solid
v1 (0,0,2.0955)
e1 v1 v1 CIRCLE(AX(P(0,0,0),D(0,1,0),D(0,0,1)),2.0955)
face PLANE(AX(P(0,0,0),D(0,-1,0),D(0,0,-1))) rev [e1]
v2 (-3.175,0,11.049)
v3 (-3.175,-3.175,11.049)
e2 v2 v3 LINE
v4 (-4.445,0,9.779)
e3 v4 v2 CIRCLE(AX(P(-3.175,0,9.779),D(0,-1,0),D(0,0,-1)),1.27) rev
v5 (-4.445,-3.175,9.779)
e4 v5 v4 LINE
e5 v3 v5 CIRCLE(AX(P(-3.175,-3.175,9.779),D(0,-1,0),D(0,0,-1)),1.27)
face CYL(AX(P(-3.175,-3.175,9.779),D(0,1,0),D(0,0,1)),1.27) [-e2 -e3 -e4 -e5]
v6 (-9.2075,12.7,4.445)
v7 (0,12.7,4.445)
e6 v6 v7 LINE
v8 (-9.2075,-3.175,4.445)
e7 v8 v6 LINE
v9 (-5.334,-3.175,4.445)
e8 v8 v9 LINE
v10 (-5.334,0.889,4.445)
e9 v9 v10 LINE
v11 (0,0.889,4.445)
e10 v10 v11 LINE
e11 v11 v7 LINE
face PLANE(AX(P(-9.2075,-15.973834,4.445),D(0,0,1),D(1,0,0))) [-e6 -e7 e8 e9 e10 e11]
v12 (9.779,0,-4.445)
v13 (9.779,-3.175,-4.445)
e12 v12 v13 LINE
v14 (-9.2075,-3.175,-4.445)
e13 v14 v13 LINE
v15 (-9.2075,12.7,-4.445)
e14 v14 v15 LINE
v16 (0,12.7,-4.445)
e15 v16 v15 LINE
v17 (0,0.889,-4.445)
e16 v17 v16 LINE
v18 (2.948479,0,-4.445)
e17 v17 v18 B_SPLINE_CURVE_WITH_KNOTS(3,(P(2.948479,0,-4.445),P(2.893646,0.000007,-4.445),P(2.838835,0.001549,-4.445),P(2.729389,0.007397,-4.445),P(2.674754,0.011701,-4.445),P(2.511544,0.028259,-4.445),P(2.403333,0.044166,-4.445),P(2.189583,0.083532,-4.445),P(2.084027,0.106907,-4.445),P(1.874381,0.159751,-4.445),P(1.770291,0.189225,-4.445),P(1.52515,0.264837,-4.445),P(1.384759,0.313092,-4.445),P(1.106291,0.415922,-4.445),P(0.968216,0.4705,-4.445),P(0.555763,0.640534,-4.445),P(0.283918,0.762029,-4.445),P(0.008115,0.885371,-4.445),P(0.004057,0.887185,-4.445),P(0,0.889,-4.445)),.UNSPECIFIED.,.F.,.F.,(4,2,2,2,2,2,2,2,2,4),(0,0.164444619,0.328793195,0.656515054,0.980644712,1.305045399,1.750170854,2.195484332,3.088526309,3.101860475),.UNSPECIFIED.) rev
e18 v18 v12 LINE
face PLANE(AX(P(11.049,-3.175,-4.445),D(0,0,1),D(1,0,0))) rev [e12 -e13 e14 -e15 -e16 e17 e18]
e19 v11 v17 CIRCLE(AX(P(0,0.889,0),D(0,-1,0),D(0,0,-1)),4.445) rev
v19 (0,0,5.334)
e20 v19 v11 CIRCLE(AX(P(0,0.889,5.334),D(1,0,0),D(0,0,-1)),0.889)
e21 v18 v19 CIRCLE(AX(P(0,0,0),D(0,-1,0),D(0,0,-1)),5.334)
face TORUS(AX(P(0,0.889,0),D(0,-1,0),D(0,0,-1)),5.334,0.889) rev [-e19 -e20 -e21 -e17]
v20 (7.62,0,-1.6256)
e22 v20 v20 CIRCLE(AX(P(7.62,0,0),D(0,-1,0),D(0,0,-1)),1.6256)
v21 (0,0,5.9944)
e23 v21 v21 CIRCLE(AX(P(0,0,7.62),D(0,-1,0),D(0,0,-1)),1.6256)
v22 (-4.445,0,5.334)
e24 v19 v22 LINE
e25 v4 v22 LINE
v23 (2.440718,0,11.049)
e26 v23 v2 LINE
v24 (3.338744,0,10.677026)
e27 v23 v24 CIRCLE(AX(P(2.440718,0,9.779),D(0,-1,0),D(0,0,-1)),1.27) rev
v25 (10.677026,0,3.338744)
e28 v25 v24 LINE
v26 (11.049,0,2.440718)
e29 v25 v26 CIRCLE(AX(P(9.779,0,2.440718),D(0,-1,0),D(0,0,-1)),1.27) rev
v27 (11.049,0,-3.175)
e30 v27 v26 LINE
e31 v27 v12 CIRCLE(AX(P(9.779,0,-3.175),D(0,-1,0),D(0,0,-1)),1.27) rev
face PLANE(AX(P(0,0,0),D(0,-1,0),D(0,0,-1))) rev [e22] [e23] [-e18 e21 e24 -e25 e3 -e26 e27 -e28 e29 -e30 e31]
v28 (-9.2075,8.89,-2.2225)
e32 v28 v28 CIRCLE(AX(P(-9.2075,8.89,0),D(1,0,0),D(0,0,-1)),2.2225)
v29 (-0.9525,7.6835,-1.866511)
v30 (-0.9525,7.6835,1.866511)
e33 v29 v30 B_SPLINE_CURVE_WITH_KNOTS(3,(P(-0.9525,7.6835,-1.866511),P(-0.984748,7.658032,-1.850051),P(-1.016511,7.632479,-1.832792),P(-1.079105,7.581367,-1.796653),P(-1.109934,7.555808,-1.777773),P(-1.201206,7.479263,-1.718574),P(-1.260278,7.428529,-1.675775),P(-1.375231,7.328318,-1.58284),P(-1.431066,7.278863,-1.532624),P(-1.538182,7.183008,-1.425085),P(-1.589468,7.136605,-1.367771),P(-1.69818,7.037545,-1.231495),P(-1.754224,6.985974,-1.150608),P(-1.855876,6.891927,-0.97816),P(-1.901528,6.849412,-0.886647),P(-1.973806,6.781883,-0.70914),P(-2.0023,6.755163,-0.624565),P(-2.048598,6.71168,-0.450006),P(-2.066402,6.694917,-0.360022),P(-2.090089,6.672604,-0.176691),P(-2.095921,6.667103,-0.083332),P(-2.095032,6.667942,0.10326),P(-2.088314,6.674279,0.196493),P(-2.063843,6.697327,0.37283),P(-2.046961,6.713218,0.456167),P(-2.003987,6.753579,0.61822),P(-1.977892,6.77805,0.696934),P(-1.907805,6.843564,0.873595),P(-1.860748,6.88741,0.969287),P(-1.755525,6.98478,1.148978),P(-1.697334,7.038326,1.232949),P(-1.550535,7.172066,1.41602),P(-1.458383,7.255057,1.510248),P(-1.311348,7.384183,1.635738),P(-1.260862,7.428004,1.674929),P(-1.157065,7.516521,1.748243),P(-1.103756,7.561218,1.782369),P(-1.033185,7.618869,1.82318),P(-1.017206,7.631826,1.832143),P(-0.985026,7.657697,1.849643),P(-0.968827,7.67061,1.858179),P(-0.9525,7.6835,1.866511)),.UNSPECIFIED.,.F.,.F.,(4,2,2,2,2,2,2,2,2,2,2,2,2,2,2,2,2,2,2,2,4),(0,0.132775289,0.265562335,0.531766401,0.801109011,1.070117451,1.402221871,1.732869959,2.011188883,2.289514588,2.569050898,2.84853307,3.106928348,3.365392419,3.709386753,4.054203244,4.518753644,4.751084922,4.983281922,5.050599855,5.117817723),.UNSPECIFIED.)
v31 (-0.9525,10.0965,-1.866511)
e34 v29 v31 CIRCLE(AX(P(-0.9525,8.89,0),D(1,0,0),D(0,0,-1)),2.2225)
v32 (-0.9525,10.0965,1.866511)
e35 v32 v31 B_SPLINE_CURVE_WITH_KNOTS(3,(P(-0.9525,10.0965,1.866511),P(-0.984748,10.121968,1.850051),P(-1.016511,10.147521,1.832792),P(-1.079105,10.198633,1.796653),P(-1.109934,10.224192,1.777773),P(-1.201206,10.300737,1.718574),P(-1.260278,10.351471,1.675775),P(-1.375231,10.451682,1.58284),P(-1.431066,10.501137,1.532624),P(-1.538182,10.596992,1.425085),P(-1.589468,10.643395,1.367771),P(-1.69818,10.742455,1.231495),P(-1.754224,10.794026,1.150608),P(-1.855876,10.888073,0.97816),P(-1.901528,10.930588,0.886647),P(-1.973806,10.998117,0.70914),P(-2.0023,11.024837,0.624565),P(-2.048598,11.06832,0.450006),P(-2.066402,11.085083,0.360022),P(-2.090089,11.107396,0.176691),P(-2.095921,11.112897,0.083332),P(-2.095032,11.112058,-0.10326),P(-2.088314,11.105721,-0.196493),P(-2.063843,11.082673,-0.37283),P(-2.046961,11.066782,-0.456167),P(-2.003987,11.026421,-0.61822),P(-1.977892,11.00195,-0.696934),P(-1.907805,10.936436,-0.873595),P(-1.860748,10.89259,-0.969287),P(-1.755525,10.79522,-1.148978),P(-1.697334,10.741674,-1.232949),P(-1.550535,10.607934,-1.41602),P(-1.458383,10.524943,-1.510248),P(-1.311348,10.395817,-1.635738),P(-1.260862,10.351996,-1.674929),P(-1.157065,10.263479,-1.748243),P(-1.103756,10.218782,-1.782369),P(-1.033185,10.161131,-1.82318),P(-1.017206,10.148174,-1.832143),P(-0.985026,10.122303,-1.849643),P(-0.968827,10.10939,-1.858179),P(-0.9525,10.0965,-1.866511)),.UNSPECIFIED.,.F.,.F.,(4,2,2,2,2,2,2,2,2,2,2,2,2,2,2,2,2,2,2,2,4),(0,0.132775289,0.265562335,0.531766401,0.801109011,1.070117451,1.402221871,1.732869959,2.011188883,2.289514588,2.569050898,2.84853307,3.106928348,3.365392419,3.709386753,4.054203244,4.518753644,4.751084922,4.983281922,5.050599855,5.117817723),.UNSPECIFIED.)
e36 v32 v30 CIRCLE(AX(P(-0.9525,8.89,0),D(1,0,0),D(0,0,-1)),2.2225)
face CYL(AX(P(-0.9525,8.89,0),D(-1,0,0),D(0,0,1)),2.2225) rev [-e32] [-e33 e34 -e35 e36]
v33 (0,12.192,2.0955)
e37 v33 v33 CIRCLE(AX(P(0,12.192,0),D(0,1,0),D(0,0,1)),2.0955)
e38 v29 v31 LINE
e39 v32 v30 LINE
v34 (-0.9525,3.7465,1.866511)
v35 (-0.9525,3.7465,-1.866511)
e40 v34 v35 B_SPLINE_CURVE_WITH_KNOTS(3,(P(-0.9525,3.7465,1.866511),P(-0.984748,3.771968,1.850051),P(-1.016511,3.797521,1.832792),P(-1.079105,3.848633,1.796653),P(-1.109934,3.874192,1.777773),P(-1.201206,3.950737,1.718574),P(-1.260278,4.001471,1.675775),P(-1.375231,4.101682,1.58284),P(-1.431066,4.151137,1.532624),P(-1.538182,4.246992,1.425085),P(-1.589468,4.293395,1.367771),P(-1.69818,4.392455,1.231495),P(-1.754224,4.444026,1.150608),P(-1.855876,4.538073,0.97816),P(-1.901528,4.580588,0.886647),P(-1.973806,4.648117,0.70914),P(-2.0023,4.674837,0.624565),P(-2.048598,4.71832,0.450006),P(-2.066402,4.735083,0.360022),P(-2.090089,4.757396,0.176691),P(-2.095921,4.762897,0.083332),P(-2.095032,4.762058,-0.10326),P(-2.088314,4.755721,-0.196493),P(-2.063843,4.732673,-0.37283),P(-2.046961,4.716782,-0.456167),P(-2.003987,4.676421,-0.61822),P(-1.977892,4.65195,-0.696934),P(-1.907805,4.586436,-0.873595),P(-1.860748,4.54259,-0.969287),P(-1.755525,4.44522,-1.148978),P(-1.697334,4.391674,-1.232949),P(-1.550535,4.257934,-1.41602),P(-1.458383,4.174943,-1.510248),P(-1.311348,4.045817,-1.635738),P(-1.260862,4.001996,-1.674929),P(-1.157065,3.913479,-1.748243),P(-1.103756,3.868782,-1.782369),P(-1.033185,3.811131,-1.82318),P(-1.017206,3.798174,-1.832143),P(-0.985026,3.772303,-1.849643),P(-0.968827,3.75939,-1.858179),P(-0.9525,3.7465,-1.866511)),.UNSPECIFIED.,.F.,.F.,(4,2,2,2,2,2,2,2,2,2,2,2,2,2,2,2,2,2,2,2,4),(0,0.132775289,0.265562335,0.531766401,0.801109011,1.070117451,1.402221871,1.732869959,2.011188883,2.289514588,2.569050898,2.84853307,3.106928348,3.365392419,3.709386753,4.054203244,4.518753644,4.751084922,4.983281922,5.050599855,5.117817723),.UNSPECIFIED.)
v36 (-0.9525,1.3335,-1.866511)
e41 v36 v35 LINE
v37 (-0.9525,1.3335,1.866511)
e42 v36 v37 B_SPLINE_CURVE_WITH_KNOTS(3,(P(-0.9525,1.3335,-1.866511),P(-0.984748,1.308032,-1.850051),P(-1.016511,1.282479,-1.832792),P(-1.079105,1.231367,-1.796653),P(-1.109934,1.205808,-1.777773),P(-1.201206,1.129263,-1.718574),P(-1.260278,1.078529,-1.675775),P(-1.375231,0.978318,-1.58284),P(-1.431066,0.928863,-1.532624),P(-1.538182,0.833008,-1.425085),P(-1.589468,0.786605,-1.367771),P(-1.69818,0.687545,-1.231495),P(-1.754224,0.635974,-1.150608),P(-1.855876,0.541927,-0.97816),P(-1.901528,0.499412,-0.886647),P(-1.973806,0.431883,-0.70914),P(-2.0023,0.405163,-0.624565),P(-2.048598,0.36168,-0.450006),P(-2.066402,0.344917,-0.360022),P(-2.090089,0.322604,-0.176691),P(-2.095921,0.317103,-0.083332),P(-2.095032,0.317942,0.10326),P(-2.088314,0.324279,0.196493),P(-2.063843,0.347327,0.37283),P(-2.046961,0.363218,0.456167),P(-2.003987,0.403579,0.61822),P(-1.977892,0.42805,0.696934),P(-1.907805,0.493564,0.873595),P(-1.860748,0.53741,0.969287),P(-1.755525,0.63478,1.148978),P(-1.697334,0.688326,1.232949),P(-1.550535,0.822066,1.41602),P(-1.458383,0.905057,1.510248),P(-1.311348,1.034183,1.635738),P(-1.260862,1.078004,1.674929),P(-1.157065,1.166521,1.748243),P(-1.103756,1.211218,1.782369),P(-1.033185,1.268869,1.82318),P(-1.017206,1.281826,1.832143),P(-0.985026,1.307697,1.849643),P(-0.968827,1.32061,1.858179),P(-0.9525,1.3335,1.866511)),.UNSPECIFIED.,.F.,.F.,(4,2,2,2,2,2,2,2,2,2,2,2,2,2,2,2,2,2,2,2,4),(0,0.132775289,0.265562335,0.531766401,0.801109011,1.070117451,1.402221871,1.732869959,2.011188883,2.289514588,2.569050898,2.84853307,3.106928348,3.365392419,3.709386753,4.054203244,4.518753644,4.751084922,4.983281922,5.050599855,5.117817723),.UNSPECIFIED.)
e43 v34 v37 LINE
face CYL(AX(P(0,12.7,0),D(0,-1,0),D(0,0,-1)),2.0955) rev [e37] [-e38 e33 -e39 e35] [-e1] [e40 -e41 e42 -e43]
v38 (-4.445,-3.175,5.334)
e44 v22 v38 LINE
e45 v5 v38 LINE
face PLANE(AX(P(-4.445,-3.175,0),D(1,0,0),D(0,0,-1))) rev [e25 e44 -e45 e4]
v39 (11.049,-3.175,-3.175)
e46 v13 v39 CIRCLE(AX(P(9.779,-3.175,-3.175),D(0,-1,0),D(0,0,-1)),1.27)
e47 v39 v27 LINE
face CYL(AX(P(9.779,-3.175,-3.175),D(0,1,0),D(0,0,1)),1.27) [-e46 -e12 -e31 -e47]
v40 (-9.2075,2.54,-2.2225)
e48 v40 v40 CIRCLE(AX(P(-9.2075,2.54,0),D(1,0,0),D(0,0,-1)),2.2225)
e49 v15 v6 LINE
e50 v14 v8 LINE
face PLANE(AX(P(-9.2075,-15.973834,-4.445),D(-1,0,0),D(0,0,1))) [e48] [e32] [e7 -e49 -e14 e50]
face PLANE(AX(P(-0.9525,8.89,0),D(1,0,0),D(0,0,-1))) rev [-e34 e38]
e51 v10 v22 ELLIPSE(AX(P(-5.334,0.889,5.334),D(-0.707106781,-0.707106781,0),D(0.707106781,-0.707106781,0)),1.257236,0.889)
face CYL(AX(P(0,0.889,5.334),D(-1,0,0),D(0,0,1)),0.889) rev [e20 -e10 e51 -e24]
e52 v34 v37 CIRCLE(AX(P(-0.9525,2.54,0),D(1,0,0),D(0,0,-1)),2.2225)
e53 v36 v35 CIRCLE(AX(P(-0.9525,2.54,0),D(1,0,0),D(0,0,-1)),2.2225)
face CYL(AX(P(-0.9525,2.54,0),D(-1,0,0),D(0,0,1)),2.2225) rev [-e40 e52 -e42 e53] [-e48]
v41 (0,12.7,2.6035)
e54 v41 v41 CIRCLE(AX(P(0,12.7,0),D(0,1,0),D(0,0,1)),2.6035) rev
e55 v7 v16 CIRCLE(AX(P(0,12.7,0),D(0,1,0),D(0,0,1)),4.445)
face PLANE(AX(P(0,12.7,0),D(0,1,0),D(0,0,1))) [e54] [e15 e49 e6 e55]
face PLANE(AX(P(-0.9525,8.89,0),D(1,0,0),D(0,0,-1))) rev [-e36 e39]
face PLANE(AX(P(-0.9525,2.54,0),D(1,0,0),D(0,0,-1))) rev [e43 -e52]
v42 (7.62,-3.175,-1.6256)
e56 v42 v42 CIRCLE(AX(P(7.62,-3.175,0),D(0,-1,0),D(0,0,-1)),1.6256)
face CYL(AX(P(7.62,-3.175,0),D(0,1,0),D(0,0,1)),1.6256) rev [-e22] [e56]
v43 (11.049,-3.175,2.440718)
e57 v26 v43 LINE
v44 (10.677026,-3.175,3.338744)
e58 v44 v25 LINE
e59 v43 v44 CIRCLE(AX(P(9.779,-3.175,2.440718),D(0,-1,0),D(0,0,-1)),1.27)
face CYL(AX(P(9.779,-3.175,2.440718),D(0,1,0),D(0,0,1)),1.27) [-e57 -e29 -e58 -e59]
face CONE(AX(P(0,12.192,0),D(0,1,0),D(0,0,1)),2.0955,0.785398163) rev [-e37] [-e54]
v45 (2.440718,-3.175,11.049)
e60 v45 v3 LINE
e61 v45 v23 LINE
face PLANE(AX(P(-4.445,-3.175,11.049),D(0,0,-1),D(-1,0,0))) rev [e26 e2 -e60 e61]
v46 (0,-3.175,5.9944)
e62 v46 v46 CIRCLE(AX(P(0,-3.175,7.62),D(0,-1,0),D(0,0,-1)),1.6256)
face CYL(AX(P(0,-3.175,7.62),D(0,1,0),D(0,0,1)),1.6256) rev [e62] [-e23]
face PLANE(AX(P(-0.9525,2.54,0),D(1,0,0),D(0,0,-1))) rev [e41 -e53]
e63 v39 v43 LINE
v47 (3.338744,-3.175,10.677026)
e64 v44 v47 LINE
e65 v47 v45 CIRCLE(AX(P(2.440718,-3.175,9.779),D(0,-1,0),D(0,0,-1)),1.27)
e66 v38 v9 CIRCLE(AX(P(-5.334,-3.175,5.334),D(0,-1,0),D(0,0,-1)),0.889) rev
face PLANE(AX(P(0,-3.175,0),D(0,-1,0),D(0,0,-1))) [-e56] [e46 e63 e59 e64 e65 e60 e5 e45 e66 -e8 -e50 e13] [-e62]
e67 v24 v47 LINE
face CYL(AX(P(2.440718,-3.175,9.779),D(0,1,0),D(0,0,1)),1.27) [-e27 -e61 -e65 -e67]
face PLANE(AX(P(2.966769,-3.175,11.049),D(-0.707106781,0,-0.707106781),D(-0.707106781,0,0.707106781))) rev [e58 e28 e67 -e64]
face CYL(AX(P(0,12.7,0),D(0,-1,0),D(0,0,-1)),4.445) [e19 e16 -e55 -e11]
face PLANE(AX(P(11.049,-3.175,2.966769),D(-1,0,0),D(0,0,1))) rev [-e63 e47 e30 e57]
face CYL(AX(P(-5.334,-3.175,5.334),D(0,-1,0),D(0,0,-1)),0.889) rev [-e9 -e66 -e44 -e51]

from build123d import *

# Parameters (mm, degrees)
SKETCH1_R           = 4.445
SKETCH1_R_2         = 2.0955
BOSS_EXTRUDE1_DEPTH = 12.7
BOSS_EXTRUDE2_START = 3.175
SKETCH2_R           = 1.6256
BOSS_EXTRUDE2_DEPTH = 3.175
FILLET5_R           = 1.27
BOSS_EXTRUDE3_REACH = 24.275
CHAMFER1_SIZE       = 0.508
SKETCH3_R           = 2.2225
CUT_EXTRUDE1_DEPTH  = 8.255
FILLET6_R           = 0.889


with BuildPart() as part:
    # Sketch1 → Boss-Extrude1 (new body)
    with BuildSketch(Plane(origin=(0, 0, 0), x_dir=(1, 0, 0), z_dir=(0, 1, 0))):
        with Locations(Location((0, 0, 0), (0, 0, 270))):
            Circle(SKETCH1_R)
        with Locations(Location((0, 0, 0), (0, 0, 270))):
            Circle(SKETCH1_R_2, mode=Mode.SUBTRACT)
    extrude(amount=BOSS_EXTRUDE1_DEPTH)

    # Sketch2 → Boss-Extrude2 (add)
    with BuildSketch(Plane.XZ.offset(BOSS_EXTRUDE2_START)):
        with BuildLine():
            Line((-4.445, 0), (-4.445, 11.049))
            Line((-4.445, 11.049), (2.966769491, 11.049))
            Line((2.966769491, 11.049), (11.049, 2.966769491))
            Line((11.049, 2.966769491), (11.049, -4.445))
            Line((11.049, -4.445), (0, -4.445))
            ThreePointArc((0, -4.445), (-3.143089642, -3.143089642), (-4.445, 0))
        make_face()
        with Locations(Location((0, 7.62, 0), (0, 0, 270))):
            Circle(SKETCH2_R, mode=Mode.SUBTRACT)
        with Locations(Location((7.62, 0, 0), (0, 0, 270))):
            Circle(SKETCH2_R, mode=Mode.SUBTRACT)
    extrude(amount=-BOSS_EXTRUDE2_DEPTH)

    # Fillet5
    fillet5_edges = [part.edges().sort_by_distance(p)[0] for p in [
        (11.049, -1.5875, -4.445),
        (11.049, -1.5875, 2.966769491),
        (2.966769491, -1.5875, 11.049),
        (-4.445, -1.5875, 11.049),
    ]]
    fillet(fillet5_edges, radius=FILLET5_R)

    # Boss-Extrude3: up to this face of the body (flat: up to its plane)
    boss_extrude3_end = Plane(part.part.faces().sort_by_distance((2.521124126, -3.175, 2.521124126))[0])
    # Sketch4 → Boss-Extrude3 (add, up to the picked face)
    with BuildSketch(Plane(origin=(0, 12.7, 0), x_dir=(1, 0, 0), z_dir=(0, 1, 0)), mode=Mode.PRIVATE) as boss_extrude3_sk1:
        with BuildLine():
            Line((0, 4.445), (-9.2075, 4.445))
            Line((-9.2075, 4.445), (-9.2075, -4.445))
            Line((-9.2075, -4.445), (0, -4.445))
            ThreePointArc((0, -4.445), (-4.445, 0), (0, 4.445))
        make_face()
    boss_extrude3_tool1 = split(extrude(boss_extrude3_sk1.sketch, amount=-BOSS_EXTRUDE3_REACH, mode=Mode.PRIVATE), bisect_by=boss_extrude3_end, keep=Keep.BOTH, mode=Mode.PRIVATE)
    add(boss_extrude3_tool1.solids().sort_by(Axis((-6.263205, 12.7, 0), (0, -1, 0)))[0])

    # Chamfer1
    chamfer1_edges = [part.edges().sort_by_distance(p)[0] for p in [
        (0, 12.7, -2.0955),
    ]]
    chamfer(chamfer1_edges, length=CHAMFER1_SIZE)

    # Sketch3 → Cut-Extrude1 (cut)
    with BuildSketch(Plane(origin=(-9.2075, 0, 0), x_dir=(0, 0, -1), z_dir=(1, 0, 0))):
        with Locations(Location((0, 8.89, 0), (0, 0, 212.878349564))):
            Circle(SKETCH3_R)
        with Locations(Location((0, 2.54, 0), (0, 0, 212.878349564))):
            Circle(SKETCH3_R)
    extrude(amount=CUT_EXTRUDE1_DEPTH, mode=Mode.SUBTRACT)

    # Fillet6
    # the kernel refuses this fillet: 0.889 mm, written as the material it adds along each edge
    with BuildSketch(Plane(origin=(-4.445, 0, 4.445), x_dir=(-1, 0, 0), z_dir=(0, -1, 0))) as fillet6_piece_1:
        with BuildLine():
            CenterArc((FILLET6_R, -FILLET6_R), FILLET6_R, 90, 90)
            Line((0, -FILLET6_R), (0, 0))
            Line((0, 0), (FILLET6_R, 0))
        make_face()
    extrude(amount=3.175)
    with BuildSketch(Plane(origin=(0, 0, 0), x_dir=(0, 0, 1), z_dir=(-1, 0, 0))) as fillet6_piece_2_section:
        with BuildLine():
            CenterArc((4.445 + FILLET6_R, FILLET6_R), FILLET6_R, 180, 90)
            Line((4.445 + FILLET6_R, 0), (4.445, 0))
            Line((4.445, 0), (4.445, FILLET6_R))
        make_face()
    fillet6_piece_2 = revolve(axis=Axis((0, 0, 0), (0, 1, 0)), revolution_arc=228.779733666, mode=Mode.PRIVATE)
    fillet6_piece_2 = split(fillet6_piece_2, bisect_by=Plane(origin=(0, 0, -4.445), z_dir=(0, 0, 1)), keep=Keep.TOP, mode=Mode.PRIVATE)
    add(fillet6_piece_2)
    with BuildSketch(Plane(origin=(-4.445, 0, 4.445), x_dir=(0, 1, 0), z_dir=(1, 0, 0))) as fillet6_piece_3:
        with BuildLine():
            CenterArc((FILLET6_R, FILLET6_R), FILLET6_R, 180, 90)
            Line((0, FILLET6_R), (0, 0))
            Line((0, 0), (FILLET6_R, 0))
        make_face()
    extrude(amount=4.445)
    with BuildSketch(Plane(origin=(-6.6675, 0, 4.445), x_dir=(0, 1, 0), z_dir=(1, 0, 0))) as fillet6_piece_4a_section:
        with BuildLine():
            CenterArc((FILLET6_R, FILLET6_R), FILLET6_R, 180, 90)
            Line((0, FILLET6_R), (0, 0))
            Line((0, 0), (FILLET6_R, 0))
        make_face()
    fillet6_piece_4a = extrude(amount=6.6675, mode=Mode.PRIVATE)
    fillet6_piece_4a = split(fillet6_piece_4a, bisect_by=Plane(origin=(-4.445, 0, 4.445), z_dir=(-1, 0, 0)), keep=Keep.TOP, mode=Mode.PRIVATE)
    with BuildSketch(Plane(origin=(-4.445, 2.2225, 4.445), x_dir=(-1, 0, 0), z_dir=(0, -1, 0))) as fillet6_piece_4b_section:
        with BuildLine():
            CenterArc((FILLET6_R, -FILLET6_R), FILLET6_R, 90, 90)
            Line((0, -FILLET6_R), (0, 0))
            Line((0, 0), (FILLET6_R, 0))
        make_face()
    fillet6_piece_4b = extrude(amount=5.3975, mode=Mode.PRIVATE)
    fillet6_piece_4b = split(fillet6_piece_4b, bisect_by=Plane(origin=(-4.445, 0, 4.445), z_dir=(0, 1, 0)), keep=Keep.TOP, mode=Mode.PRIVATE)
    fillet6_piece_4 = fillet6_piece_4a & fillet6_piece_4b
    add(fillet6_piece_4)


solid = part.part
